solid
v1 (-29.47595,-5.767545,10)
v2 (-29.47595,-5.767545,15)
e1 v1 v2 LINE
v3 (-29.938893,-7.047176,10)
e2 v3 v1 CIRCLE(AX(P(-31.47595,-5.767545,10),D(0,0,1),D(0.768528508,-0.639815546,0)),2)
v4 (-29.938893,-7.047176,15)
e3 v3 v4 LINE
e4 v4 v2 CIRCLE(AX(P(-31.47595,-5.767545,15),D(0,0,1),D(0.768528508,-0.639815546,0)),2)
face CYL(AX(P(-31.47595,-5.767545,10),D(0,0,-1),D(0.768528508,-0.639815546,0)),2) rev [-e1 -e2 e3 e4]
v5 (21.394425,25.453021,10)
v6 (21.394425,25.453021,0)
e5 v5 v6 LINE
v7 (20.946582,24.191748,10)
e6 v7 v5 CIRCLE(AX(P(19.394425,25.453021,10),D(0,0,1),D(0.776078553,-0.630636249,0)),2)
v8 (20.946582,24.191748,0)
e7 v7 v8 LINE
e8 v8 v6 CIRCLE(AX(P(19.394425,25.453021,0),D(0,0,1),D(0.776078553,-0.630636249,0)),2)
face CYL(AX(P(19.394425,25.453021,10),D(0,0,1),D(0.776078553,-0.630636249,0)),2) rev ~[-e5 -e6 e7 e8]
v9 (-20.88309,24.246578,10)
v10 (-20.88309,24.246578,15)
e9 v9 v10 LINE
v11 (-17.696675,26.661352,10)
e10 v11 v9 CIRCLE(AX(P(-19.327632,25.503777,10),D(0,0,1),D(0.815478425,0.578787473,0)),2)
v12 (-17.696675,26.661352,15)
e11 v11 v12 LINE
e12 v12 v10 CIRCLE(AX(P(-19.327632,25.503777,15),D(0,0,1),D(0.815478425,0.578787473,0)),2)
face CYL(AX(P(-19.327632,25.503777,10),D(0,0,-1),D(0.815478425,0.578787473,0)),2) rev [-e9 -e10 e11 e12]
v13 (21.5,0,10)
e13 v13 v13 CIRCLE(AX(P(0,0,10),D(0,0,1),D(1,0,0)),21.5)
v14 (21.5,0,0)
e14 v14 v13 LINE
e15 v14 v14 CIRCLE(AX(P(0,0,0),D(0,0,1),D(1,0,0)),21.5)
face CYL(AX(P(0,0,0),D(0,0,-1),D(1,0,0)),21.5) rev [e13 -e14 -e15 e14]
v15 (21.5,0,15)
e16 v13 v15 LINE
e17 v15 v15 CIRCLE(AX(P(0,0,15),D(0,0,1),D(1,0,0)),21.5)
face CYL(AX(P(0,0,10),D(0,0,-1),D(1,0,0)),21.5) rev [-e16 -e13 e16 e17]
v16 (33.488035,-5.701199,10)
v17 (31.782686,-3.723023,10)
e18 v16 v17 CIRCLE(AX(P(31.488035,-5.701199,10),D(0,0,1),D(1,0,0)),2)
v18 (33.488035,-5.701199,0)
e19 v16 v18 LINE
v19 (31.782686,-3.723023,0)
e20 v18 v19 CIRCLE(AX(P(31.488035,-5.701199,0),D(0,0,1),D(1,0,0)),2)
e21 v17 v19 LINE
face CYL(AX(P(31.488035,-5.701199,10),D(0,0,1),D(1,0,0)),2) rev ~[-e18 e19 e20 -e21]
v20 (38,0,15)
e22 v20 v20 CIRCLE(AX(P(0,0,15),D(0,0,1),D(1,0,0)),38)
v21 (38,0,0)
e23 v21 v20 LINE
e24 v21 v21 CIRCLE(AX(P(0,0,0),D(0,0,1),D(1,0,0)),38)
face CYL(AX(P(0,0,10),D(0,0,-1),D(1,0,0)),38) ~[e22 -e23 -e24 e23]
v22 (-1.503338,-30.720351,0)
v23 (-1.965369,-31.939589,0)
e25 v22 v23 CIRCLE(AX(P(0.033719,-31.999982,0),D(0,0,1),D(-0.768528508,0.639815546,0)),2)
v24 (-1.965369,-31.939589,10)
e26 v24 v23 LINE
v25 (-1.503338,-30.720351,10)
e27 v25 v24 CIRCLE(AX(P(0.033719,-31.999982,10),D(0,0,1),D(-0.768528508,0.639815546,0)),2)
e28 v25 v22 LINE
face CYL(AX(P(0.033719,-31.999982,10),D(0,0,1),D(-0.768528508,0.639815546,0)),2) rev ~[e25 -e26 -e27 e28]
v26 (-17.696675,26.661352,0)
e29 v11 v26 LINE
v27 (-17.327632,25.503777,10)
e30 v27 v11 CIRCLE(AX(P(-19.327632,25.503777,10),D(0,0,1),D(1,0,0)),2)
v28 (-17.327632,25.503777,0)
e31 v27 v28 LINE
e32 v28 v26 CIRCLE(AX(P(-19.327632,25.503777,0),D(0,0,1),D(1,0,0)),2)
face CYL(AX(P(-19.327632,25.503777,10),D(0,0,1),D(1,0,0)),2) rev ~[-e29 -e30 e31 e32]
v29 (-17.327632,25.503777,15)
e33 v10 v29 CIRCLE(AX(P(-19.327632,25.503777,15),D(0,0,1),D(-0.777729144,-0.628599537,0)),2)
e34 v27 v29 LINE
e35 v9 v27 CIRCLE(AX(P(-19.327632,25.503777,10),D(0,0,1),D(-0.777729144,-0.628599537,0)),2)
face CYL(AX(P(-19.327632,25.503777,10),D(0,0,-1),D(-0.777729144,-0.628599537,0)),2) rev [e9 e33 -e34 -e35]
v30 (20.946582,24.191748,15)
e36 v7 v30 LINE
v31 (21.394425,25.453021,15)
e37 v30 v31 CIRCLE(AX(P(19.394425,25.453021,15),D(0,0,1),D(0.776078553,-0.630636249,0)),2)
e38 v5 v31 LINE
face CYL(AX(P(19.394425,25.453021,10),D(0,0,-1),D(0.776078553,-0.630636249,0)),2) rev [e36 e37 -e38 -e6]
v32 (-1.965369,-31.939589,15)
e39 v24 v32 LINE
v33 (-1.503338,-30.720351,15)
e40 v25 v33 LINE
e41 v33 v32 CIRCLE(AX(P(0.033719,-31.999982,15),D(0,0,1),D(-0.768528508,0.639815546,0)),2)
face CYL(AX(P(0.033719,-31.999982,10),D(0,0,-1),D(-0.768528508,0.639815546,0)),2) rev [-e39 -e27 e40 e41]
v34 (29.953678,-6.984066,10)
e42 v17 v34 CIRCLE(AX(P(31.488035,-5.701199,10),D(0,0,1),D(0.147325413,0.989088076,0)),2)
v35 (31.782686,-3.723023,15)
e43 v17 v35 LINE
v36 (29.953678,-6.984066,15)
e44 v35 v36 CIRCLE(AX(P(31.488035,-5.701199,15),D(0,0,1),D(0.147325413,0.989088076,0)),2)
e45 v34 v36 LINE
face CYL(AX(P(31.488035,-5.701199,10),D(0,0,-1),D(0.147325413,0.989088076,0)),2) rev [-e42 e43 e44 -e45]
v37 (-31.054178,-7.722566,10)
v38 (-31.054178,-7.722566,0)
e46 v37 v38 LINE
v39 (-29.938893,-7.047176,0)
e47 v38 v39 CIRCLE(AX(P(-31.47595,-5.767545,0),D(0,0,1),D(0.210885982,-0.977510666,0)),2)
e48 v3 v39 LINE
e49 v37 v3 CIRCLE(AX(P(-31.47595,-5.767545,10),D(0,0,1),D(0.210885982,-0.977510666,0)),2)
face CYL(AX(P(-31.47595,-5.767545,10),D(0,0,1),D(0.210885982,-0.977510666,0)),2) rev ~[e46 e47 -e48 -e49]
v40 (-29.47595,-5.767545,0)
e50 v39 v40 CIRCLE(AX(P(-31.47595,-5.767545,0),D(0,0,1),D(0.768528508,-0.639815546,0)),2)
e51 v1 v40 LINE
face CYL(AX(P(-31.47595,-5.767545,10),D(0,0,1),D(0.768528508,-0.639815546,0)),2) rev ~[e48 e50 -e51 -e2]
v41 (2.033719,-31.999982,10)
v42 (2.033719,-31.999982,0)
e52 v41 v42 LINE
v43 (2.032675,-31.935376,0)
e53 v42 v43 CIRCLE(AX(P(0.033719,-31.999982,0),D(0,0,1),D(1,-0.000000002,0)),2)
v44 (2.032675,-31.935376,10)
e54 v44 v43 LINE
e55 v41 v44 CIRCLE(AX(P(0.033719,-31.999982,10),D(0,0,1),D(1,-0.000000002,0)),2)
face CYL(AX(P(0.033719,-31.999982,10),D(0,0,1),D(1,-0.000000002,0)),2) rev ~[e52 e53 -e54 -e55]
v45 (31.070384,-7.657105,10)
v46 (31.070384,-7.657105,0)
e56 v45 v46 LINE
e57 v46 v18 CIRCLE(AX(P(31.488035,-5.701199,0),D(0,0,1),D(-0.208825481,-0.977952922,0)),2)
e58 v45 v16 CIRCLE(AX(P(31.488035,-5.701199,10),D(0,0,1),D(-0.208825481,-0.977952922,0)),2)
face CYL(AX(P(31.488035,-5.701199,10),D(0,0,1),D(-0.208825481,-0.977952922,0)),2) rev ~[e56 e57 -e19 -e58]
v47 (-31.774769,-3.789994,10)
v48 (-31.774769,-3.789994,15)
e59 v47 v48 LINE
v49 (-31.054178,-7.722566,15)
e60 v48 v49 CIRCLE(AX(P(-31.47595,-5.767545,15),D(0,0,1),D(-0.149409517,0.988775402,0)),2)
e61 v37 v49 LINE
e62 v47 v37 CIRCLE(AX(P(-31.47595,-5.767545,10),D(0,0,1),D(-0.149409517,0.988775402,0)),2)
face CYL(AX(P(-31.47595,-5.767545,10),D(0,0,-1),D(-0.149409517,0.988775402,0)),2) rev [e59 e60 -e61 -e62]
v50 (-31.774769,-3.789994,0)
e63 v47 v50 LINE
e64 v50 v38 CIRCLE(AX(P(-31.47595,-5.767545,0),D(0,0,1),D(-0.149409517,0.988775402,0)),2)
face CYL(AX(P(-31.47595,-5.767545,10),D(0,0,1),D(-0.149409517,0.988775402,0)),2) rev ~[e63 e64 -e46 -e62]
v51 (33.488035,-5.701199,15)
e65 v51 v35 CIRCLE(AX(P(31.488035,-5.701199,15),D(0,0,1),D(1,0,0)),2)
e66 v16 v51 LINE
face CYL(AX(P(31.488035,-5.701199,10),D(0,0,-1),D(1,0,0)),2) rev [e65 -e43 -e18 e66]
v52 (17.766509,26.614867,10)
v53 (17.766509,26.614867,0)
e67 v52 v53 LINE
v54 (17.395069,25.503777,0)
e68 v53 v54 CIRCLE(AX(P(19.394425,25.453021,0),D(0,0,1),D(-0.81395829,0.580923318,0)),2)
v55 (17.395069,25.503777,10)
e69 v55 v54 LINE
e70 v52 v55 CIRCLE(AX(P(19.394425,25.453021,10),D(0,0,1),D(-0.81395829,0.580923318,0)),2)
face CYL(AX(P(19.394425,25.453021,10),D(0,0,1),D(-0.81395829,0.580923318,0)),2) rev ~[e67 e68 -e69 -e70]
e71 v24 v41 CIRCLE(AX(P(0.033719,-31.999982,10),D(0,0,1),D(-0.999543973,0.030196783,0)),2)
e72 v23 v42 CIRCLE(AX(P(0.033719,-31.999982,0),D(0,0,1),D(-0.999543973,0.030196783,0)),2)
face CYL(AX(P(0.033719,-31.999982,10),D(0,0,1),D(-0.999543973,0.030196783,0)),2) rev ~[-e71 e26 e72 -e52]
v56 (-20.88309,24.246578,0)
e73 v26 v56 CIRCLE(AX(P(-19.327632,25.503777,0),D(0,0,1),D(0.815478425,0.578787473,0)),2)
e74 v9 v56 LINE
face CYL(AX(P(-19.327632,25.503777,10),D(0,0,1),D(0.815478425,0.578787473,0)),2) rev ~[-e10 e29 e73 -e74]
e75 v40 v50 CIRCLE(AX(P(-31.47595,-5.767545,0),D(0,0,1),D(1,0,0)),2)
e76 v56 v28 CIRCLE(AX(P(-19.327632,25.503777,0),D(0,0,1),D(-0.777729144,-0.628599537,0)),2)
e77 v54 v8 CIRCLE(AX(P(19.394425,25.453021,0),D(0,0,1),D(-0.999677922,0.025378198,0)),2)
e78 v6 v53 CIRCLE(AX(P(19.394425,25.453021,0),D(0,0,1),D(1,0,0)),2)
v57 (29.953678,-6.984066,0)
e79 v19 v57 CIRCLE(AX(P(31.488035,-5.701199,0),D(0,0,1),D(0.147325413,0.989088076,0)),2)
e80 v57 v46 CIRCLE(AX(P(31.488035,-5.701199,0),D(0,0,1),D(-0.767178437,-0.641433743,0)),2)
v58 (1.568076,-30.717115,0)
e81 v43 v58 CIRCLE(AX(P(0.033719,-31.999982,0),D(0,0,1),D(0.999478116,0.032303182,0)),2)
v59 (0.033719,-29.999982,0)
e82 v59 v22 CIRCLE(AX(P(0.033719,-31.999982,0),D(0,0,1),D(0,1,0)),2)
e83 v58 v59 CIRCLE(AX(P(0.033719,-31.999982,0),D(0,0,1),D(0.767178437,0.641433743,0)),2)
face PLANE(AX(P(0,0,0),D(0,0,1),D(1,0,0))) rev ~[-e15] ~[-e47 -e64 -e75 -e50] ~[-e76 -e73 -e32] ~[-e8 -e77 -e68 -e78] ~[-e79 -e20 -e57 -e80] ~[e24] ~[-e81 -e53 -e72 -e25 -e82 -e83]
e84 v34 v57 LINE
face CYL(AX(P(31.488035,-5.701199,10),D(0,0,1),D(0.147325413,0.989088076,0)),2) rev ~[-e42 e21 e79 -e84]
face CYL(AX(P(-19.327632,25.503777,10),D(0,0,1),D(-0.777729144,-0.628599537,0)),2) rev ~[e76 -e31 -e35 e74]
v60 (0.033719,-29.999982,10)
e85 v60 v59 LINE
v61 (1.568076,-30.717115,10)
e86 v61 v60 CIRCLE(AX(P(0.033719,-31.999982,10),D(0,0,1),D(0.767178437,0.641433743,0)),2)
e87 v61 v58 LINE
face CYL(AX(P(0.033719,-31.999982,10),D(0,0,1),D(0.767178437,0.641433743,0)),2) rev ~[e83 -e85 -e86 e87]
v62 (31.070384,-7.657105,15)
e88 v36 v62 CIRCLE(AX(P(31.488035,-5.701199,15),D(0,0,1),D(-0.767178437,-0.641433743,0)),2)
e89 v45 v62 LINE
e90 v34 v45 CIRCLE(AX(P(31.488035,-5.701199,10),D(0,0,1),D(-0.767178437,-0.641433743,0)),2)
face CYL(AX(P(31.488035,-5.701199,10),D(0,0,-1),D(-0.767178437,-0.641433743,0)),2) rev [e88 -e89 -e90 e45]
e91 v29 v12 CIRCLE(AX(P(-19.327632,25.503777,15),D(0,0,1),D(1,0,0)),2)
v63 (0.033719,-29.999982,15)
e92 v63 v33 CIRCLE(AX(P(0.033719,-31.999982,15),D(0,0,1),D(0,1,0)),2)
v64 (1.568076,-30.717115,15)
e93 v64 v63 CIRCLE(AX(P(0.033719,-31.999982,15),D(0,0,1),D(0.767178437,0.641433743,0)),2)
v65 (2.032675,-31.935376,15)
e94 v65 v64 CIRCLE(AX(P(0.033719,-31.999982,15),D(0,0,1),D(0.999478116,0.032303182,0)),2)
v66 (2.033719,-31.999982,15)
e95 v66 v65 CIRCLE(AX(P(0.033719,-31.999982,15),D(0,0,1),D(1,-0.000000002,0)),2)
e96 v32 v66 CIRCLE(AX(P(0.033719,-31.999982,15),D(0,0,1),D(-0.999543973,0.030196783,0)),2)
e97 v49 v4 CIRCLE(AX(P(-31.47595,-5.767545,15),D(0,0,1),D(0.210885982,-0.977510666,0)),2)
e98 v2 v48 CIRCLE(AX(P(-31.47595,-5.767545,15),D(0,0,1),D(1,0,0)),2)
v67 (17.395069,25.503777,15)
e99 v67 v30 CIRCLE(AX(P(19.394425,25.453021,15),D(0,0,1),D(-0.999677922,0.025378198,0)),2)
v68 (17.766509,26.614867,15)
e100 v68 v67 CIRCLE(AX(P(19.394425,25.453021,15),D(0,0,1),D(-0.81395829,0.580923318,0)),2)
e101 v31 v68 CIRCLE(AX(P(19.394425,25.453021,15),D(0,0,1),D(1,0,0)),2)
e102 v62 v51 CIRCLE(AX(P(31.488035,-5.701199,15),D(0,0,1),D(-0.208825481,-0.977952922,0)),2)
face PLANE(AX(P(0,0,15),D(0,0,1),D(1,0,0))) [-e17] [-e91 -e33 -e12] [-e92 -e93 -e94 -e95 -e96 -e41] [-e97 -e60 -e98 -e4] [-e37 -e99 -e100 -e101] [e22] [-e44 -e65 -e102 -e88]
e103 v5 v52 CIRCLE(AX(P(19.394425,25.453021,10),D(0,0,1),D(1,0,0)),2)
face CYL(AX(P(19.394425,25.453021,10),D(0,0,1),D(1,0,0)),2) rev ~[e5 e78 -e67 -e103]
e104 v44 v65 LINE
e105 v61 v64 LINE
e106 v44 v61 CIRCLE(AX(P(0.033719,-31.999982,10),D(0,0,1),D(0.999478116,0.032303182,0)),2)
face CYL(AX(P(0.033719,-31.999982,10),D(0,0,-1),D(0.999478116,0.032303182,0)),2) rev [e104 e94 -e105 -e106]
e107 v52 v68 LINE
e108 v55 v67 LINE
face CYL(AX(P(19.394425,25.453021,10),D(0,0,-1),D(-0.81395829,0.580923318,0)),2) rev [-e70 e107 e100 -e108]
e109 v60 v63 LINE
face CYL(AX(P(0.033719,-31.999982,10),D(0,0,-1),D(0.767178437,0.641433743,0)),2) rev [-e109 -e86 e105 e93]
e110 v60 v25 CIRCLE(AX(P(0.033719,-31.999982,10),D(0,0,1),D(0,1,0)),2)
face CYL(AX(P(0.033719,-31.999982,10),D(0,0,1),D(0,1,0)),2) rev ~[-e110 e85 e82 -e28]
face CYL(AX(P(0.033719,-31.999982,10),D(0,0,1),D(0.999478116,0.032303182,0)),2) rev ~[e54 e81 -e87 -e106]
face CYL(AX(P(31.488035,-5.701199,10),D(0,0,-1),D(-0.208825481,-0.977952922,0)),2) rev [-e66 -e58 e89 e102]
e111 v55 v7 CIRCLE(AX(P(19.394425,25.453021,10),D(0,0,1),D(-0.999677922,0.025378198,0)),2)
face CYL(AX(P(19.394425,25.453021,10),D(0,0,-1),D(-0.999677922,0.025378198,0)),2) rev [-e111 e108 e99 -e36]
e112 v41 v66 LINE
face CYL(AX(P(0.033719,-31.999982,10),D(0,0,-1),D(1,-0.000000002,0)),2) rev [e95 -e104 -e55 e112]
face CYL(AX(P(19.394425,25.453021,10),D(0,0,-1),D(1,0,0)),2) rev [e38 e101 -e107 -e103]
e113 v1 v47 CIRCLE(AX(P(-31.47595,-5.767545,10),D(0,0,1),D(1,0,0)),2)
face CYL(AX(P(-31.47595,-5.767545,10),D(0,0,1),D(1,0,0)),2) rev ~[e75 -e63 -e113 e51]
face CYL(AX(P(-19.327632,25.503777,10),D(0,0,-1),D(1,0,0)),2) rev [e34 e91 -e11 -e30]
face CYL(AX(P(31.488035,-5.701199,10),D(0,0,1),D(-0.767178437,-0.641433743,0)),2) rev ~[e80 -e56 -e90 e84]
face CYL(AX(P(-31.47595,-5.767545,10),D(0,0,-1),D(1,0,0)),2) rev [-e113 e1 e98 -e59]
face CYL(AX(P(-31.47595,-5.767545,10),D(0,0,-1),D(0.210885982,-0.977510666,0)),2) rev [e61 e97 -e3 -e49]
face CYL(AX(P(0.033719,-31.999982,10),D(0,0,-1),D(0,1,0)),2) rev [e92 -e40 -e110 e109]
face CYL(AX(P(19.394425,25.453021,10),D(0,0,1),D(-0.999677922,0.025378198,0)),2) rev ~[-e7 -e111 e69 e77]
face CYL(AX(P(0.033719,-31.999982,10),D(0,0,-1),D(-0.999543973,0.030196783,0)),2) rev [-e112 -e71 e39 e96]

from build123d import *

# Parameters (mm, degrees)
F0_R     = 38
F0_R_2   = 21.5
F1_DEPTH = 10
F3_DEPTH = 10
F4_DEPTH = 5


with BuildPart() as f1:
    # F0 (on Top) → F1 (new body)
    with BuildSketch(Plane.XY):
        Circle(F0_R)
        Circle(F0_R_2, mode=Mode.SUBTRACT)
    extrude(amount=F1_DEPTH)

    # F2 (on face) → F3 (cut)
    with BuildSketch(Plane.XY.offset(10)):
        with BuildLine():
            ThreePointArc((17.3950694854, 25.5037771635), (18.7013512829, 23.576948176), (20.9465824354, 24.1917482683))
            ThreePointArc((20.9465824354, 24.1917482683), (19.3944253287, 25.4530207671), (17.7665087481, 26.6148674035))
            ThreePointArc((17.7665087481, 26.6148674035), (17.4976104485, 26.0871290467), (17.3950694854, 25.5037771635))
        make_face()
        with BuildLine():
            ThreePointArc((17.7665087481, 26.6148674035), (19.3944253287, 25.4530207671), (20.9465824354, 24.1917482683))
            ThreePointArc((20.9465824354, 24.1917482683), (21.2791420466, 24.7838101177), (21.3944253287, 25.4530207671))
            ThreePointArc((21.3944253287, 25.4530207671), (20.0044117379, 27.3577298212), (17.7665087481, 26.6148674035))
        make_face()
        with BuildLine():
            ThreePointArc((33.4880347509, -5.7011987796), (33.0028452429, -4.3953085953), (31.7826855775, -3.7230226271))
            ThreePointArc((31.7826855775, -3.7230226271), (31.6508184403, -4.7144132252), (31.4880347509, -5.7011987796))
            ThreePointArc((31.4880347509, -5.7011987796), (31.2944935166, -6.6824153971), (31.0703837886, -7.6571046244))
            ThreePointArc((31.0703837886, -7.6571046244), (32.7459493099, -7.2560785056), (33.4880347509, -5.7011987796))
        make_face()
        with BuildLine():
            ThreePointArc((31.4880347509, -5.7011987796), (31.6508184403, -4.7144132252), (31.7826855775, -3.7230226271))
            ThreePointArc((31.7826855775, -3.7230226271), (29.7436669076, -4.7228425934), (29.9536778777, -6.9840662652))
            Line((29.9536778777, -6.9840662652), (31.4880347509, -5.7011987796))
        make_face()
        with BuildLine():
            ThreePointArc((31.0703837886, -7.6571046244), (31.2944935166, -6.6824153971), (31.4880347509, -5.7011987796))
            Line((31.4880347509, -5.7011987796), (29.9536778777, -6.9840662652))
            ThreePointArc((29.9536778777, -6.9840662652), (30.4556448993, -7.414141042), (31.0703837886, -7.6571046244))
        make_face()
        with BuildLine():
            ThreePointArc((-17.3276317844, 25.5037771635), (-17.4221248046, 26.1112663816), (-17.6966749345, 26.6613521087))
            ThreePointArc((-17.6966749345, 26.6613521087), (-19.3276317844, 25.5037771635), (-20.8830900727, 24.2465780888))
            ThreePointArc((-20.8830900727, 24.2465780888), (-18.6608921713, 23.6181848724), (-17.3276317844, 25.5037771635))
        make_face()
        with BuildLine():
            ThreePointArc((-20.8830900727, 24.2465780888), (-19.3276317844, 25.5037771635), (-17.6966749345, 26.6613521087))
            ThreePointArc((-17.6966749345, 26.6613521087), (-20.5356087709, 27.0977632362), (-20.8830900727, 24.2465780888))
        make_face()
        with BuildLine():
            Line((0.0337188505, -31.999982235), (1.5680757237, -30.7171147494))
            ThreePointArc((1.5680757237, -30.7171147494), (0.8805556201, -30.1881137283), (0.0337188505, -29.999982235))
            Line((0.0337188505, -29.999982235), (0.0337188505, -31.999982235))
        make_face()
        with BuildLine():
            ThreePointArc((2.0326750825, -31.9353758708), (1.9024391118, -31.2873220179), (1.5680757237, -30.7171147494))
            Line((1.5680757237, -30.7171147494), (0.0337188505, -31.999982235))
            ThreePointArc((0.0337188505, -31.999982235), (1.033701827, -31.983299713), (2.0326750825, -31.9353758708))
        make_face()
        with BuildLine():
            ThreePointArc((2.0337188505, -31.999982235), (2.0334578915, -31.9676748374), (2.0326750825, -31.9353758708))
            ThreePointArc((2.0326750825, -31.9353758708), (1.033701827, -31.983299713), (0.0337188505, -31.999982235))
            ThreePointArc((0.0337188505, -31.999982235), (-0.9662970627, -31.9854071412), (-1.9653690958, -31.9395886686))
            ThreePointArc((-1.9653690958, -31.9395886686), (0.003518624, -33.9997542086), (2.0337188505, -31.999982235))
        make_face()
        with BuildLine():
            Line((0.0337188505, -31.999982235), (0.0337188505, -29.999982235))
            ThreePointArc((0.0337188505, -29.999982235), (-0.8150266404, -30.189007058), (-1.503338165, -30.7203511432))
            Line((-1.503338165, -30.7203511432), (0.0337188505, -31.999982235))
        make_face()
        with BuildLine():
            ThreePointArc((-1.9653690958, -31.9395886686), (-0.9662970627, -31.9854071412), (0.0337188505, -31.999982235))
            Line((0.0337188505, -31.999982235), (-1.503338165, -30.7203511432))
            ThreePointArc((-1.503338165, -30.7203511432), (-1.8364991405, -31.2912617919), (-1.9653690958, -31.9395886686))
        make_face()
        with BuildLine():
            ThreePointArc((-29.4759499676, -5.7675448535), (-30.1716566854, -4.2513591676), (-31.7747690017, -3.7899940488))
            ThreePointArc((-31.7747690017, -3.7899940488), (-31.640812874, -4.7811045451), (-31.4759499676, -5.7675448535))
            Line((-31.4759499676, -5.7675448535), (-29.9388929521, -7.0471759453))
            ThreePointArc((-29.9388929521, -7.0471759453), (-29.5952434473, -6.4479439896), (-29.4759499676, -5.7675448535))
        make_face()
        with BuildLine():
            ThreePointArc((-31.4759499676, -5.7675448535), (-31.640812874, -4.7811045451), (-31.7747690017, -3.7899940488))
            ThreePointArc((-31.7747690017, -3.7899940488), (-33.4431968406, -6.1280164068), (-31.054178004, -7.722566186))
            ThreePointArc((-31.054178004, -7.722566186), (-31.2803413207, -6.7483514181), (-31.4759499676, -5.7675448535))
        make_face()
        with BuildLine():
            Line((-29.9388929521, -7.0471759453), (-31.4759499676, -5.7675448535))
            ThreePointArc((-31.4759499676, -5.7675448535), (-31.2803413207, -6.7483514181), (-31.054178004, -7.722566186))
            ThreePointArc((-31.054178004, -7.722566186), (-30.4399525078, -7.4783076258), (-29.9388929521, -7.0471759453))
        make_face()
    extrude(amount=-F3_DEPTH, mode=Mode.SUBTRACT)

    # F4 (add): a face of the model
    f4_faces = [f1.faces().sort_by_distance(p)[0] for p in [
        (-36.9251976926, 0, 10),
    ]]
    extrude(f4_faces, amount=F4_DEPTH)


solid = f1.part
